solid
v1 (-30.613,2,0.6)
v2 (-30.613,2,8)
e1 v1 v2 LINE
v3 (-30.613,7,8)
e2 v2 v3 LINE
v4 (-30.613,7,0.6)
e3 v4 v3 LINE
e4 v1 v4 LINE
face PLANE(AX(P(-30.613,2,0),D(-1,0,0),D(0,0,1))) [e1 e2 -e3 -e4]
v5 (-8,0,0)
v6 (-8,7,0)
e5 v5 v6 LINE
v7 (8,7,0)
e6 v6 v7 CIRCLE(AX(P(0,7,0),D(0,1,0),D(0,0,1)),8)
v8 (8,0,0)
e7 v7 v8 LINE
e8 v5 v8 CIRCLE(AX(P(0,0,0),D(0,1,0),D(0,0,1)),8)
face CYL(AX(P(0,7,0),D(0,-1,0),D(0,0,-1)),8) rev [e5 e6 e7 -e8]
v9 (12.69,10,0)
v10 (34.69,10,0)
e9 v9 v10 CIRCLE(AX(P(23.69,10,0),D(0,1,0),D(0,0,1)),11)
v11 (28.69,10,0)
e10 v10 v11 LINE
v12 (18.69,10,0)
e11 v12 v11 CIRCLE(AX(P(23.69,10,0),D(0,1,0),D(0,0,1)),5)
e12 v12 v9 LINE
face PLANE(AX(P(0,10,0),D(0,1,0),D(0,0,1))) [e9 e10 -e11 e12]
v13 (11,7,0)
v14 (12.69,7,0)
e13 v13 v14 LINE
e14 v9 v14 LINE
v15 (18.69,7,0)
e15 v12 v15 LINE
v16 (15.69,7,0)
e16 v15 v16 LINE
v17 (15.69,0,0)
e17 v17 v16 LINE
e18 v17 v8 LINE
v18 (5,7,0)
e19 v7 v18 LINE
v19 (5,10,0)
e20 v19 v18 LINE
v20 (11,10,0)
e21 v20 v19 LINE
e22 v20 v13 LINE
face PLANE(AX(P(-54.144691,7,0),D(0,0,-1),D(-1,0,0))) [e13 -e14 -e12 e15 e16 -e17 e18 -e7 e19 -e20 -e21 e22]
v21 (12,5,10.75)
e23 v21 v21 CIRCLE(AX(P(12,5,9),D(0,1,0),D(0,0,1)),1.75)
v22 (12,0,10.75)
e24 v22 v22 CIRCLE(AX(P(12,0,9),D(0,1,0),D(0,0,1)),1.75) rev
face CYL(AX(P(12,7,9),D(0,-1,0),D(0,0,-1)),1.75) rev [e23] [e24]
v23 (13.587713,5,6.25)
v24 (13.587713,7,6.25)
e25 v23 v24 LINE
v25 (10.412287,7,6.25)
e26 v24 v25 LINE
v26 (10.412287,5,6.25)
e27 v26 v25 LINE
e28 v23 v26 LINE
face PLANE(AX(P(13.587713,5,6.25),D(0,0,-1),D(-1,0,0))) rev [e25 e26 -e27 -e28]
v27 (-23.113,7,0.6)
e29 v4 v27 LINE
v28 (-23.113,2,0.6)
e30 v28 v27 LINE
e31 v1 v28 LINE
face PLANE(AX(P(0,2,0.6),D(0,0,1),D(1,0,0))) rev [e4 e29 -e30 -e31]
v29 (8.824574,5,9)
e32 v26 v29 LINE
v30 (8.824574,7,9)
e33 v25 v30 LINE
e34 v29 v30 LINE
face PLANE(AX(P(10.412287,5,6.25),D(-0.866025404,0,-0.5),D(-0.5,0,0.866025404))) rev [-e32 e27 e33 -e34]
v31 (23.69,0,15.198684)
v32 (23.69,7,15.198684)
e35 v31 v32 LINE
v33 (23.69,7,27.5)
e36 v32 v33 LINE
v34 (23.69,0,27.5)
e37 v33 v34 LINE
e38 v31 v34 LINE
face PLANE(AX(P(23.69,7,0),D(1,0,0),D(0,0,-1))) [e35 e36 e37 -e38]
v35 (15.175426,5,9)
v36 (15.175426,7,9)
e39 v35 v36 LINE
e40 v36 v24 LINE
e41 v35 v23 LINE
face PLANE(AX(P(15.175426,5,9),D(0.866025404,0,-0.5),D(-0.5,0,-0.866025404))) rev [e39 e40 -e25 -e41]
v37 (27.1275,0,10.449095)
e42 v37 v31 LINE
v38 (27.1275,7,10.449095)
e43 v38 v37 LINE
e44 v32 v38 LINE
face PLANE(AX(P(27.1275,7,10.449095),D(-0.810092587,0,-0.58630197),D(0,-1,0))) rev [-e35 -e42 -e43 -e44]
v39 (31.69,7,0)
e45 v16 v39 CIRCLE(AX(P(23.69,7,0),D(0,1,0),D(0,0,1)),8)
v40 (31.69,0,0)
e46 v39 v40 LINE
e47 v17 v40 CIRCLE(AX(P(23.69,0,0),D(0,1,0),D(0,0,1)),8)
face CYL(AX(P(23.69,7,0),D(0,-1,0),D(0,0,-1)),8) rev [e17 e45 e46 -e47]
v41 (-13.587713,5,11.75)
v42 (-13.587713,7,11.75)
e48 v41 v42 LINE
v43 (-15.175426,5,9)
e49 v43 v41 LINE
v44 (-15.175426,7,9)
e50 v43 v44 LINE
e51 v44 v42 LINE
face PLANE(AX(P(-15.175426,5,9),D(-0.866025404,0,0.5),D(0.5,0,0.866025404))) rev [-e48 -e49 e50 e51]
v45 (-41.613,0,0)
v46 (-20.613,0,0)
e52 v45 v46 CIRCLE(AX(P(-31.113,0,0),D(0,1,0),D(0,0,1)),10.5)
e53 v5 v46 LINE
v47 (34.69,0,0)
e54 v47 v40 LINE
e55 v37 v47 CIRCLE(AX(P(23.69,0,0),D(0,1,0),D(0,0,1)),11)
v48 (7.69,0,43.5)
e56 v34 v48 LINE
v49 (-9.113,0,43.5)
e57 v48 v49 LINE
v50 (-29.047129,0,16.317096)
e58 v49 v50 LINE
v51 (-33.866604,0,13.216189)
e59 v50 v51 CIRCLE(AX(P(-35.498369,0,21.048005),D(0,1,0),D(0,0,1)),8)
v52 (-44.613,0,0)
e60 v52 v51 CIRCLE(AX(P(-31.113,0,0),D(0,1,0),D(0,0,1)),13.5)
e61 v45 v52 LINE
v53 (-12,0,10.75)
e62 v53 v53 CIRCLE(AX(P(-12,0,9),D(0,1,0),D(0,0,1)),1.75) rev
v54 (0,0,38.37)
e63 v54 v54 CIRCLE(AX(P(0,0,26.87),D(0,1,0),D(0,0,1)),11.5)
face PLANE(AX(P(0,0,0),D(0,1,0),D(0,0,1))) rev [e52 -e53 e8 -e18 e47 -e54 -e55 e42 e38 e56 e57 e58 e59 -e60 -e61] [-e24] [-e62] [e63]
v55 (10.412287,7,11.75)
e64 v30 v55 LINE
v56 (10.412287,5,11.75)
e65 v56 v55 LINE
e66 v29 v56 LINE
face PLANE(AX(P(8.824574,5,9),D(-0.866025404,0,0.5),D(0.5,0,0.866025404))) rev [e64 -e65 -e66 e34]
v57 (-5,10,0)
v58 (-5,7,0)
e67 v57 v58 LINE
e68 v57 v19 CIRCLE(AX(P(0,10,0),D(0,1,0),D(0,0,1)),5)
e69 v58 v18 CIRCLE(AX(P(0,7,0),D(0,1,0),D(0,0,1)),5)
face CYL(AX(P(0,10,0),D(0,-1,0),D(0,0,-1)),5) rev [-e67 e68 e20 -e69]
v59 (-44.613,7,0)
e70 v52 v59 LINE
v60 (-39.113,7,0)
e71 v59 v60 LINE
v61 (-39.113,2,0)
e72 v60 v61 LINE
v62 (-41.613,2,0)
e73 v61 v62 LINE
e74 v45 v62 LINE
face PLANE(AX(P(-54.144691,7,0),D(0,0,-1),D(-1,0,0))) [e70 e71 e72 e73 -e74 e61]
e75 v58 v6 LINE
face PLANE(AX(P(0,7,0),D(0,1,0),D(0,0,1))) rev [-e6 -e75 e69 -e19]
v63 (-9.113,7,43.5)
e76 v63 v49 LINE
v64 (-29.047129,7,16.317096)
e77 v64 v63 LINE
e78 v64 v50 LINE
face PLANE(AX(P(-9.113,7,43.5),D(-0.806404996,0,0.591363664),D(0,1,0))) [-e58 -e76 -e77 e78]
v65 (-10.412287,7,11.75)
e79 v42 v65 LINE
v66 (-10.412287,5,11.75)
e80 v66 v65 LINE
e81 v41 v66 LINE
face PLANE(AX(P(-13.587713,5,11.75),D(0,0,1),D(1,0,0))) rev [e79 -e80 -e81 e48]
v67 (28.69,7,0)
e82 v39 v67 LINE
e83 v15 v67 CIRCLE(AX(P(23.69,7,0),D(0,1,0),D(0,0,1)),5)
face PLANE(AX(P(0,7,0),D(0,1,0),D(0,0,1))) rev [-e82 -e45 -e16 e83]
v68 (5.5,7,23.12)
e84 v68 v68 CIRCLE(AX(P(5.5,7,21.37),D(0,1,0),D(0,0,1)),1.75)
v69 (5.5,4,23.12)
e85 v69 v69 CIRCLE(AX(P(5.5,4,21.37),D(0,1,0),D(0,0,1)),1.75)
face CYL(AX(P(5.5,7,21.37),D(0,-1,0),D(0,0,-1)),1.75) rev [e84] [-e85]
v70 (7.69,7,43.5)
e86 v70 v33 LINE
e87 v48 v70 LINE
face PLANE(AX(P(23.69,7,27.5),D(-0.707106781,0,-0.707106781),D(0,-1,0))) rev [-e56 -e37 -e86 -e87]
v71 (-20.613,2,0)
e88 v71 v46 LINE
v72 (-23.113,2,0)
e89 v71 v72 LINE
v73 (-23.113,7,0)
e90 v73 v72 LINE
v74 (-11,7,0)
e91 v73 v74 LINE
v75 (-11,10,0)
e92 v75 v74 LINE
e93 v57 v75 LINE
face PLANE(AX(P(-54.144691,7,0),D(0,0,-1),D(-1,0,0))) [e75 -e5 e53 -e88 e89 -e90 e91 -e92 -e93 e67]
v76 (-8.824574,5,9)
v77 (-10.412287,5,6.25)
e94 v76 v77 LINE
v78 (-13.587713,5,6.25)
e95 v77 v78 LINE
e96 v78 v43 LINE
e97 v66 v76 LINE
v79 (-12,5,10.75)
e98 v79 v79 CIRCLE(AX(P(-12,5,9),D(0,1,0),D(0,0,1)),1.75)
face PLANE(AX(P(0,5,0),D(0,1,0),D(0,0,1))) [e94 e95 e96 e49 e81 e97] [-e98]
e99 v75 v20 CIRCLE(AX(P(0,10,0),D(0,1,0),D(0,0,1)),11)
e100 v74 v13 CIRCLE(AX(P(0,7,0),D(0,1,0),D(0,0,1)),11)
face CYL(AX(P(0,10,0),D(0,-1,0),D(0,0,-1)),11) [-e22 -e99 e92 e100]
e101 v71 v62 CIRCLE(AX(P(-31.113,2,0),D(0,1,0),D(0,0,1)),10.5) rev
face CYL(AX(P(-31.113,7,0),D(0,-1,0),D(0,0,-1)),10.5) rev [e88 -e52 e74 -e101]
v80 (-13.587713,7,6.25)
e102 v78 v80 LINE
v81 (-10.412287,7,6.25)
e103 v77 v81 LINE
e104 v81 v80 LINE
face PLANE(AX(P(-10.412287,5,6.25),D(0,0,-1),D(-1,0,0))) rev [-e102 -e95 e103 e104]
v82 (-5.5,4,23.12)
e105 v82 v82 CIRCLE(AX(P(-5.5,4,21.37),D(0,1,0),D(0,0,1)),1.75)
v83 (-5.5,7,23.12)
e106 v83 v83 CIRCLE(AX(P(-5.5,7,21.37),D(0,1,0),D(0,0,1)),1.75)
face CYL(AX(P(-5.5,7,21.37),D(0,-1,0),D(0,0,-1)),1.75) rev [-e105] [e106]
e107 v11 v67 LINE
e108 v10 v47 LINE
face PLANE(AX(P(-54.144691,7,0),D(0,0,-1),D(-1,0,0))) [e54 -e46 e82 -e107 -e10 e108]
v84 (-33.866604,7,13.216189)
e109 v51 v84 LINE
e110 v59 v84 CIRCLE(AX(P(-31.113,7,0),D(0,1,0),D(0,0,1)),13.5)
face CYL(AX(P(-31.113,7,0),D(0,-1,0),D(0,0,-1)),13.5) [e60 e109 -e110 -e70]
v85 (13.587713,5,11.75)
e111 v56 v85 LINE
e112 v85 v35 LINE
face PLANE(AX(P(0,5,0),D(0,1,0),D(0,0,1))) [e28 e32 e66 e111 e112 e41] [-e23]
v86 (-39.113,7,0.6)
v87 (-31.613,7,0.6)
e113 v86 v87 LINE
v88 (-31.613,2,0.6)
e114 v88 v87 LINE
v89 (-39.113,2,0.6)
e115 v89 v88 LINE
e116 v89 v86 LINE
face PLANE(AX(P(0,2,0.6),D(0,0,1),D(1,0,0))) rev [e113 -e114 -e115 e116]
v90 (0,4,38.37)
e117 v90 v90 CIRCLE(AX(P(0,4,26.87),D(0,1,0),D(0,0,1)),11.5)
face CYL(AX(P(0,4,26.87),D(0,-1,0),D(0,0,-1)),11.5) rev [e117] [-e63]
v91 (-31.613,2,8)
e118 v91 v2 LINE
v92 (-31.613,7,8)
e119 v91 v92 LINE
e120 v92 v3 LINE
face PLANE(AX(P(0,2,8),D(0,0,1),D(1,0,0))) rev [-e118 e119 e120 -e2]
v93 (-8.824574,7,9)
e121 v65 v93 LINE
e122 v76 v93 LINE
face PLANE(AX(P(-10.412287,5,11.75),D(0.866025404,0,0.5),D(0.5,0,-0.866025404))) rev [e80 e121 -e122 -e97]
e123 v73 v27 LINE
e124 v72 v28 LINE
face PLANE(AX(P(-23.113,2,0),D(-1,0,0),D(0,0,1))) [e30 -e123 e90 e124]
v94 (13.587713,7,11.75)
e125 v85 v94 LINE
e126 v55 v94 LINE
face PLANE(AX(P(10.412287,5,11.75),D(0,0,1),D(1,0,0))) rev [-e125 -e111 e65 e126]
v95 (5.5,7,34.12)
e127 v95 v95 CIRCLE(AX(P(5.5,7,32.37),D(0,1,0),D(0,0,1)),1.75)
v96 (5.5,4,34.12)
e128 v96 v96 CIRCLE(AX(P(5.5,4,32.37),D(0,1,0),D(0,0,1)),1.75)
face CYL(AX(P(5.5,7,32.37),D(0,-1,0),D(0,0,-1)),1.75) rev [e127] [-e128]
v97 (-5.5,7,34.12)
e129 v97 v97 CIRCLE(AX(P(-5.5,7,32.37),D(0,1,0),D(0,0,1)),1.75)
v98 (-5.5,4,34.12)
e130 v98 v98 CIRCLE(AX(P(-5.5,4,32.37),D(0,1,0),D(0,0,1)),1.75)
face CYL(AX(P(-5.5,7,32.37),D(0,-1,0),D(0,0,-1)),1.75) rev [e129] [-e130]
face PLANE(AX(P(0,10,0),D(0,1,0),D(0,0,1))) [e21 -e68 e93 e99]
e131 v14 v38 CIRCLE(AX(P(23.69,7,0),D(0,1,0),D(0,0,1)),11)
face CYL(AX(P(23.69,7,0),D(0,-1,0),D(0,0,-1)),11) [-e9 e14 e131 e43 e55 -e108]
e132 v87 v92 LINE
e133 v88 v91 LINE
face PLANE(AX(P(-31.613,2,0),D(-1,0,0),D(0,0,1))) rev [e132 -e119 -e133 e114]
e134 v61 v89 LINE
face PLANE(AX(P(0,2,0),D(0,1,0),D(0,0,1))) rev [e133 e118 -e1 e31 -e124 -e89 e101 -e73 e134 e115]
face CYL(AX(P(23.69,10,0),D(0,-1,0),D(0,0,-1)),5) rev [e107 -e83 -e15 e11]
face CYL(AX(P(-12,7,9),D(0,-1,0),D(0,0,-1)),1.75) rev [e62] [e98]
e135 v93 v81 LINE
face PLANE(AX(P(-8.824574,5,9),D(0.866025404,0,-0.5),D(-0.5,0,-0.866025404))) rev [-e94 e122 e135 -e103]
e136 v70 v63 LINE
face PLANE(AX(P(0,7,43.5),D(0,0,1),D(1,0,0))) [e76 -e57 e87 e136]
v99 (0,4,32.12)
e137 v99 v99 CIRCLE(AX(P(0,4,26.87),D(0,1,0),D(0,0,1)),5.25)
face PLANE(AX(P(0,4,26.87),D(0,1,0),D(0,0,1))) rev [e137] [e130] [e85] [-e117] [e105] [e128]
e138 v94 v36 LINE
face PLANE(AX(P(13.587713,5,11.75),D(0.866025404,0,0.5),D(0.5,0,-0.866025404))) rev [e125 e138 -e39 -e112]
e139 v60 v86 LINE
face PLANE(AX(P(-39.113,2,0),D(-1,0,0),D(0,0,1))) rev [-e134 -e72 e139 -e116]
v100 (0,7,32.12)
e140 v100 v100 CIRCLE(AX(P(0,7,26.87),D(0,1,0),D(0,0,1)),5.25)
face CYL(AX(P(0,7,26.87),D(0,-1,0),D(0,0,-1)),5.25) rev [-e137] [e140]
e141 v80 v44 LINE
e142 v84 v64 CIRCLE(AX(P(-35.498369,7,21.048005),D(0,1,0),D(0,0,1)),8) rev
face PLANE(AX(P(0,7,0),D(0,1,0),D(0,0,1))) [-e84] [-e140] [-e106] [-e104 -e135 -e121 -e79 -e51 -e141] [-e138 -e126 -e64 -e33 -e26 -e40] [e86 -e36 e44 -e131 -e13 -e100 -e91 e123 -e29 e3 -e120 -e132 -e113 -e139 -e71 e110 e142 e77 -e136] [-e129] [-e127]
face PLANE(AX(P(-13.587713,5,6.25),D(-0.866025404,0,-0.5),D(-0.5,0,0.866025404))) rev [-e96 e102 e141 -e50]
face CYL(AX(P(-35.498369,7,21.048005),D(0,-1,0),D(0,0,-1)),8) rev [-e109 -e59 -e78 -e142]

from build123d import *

# Parameters (mm, degrees)
SKETCH3_R               = 8
SKETCH3_W               = 54.803
SKETCH3_H               = 30
SKETCH3_R_2             = 5.25
BOSS_EXTRUDE1_DEPTH     = 7
CUT_EXTRUDE3_DEPTH      = 63.702230973
CUT_EXTRUDE3_DEPTH_BACK = 63.702230973
SKETCH4_R               = 1.75
CHAMFER1_SIZE           = 2.5
CUT_EXTRUDE5_DEPTH      = 63.702230973
CUT_EXTRUDE5_DEPTH_BACK = 63.702230973
SKETCH9_R               = 1.75
CUT_EXTRUDE6_START      = -2
SKETCH10_R              = 1.75
CUT_EXTRUDE6_DEPTH      = 2
CHAMFER3_SIZE2          = 22
CHAMFER3_SIZE           = 30
CHAMFER4_SIZE           = 16
FILLET1_DEPTH           = 7
BOSS_EXTRUDE6_START     = -5
SKETCH15_R              = 10.5
BOSS_EXTRUDE6_DEPTH     = 5
CUT_EXTRUDE7_DEPTH      = 63.702230973
CUT_EXTRUDE7_DEPTH_BACK = 63.702230973
SKETCH16_W              = 93.911326915
SKETCH16_H              = 20.32689663
SKETCH17_R              = 11.5
SKETCH17_R_2            = 5.25
CUT_EXTRUDE8_DEPTH      = 4
BOSS_EXTRUDE7_DEPTH     = 3


with BuildPart() as part:
    # Sketch3 → Boss-Extrude1 (new body)
    # profile 1 of 10: a face of its own
    with BuildSketch(Plane(origin=(0, 0, 0), x_dir=(1, 0, 0), z_dir=(0, 1, 0))):
        with BuildLine():
            ThreePointArc((-17.613, 0), (-21.567058454, 9.545941546), (-31.113, 13.5))
            Line((-31.113, 13.5), (-31.113, 10.5))
            ThreePointArc((-31.113, 10.5), (-23.688378798, 7.424621202), (-20.613, 0))
            ThreePointArc((-20.613, 0), (-23.688378798, -7.424621202), (-31.113, -10.5))
            Line((-31.113, -10.5), (-31.113, -13.5))
            ThreePointArc((-31.113, -13.5), (-21.567058454, -9.545941546), (-17.613, 0))
        make_face()
    # profile 2 of 10: a face of its own
    with BuildSketch(Plane(origin=(0, 0, 0), x_dir=(1, 0, 0), z_dir=(0, 1, 0))):
        with BuildLine():
            Line((-31.113, 10.5), (-31.113, 13.5))
            ThreePointArc((-31.113, 13.5), (-44.613, 0), (-31.113, -13.5))
            Line((-31.113, -13.5), (-31.113, -10.5))
            ThreePointArc((-31.113, -10.5), (-41.613, 0), (-31.113, 10.5))
        make_face()
    # profile 3 of 10: a face of its own
    with BuildSketch(Plane(origin=(0, 0, 0), x_dir=(1, 0, 0), z_dir=(0, 1, 0))):
        with BuildLine():
            Line((23.69, 13.5), (-31.113, 13.5))
            ThreePointArc((-31.113, 13.5), (-21.567058454, 9.545941546), (-17.613, 0))
            ThreePointArc((-17.613, 0), (-21.567058454, -9.545941546), (-31.113, -13.5))
            Line((-31.113, -13.5), (23.69, -13.5))
            Line((23.69, -13.5), (23.69, -11))
            ThreePointArc((23.69, -11), (12.69, 0), (23.69, 11))
            Line((23.69, 11), (23.69, 13.5))
        make_face()
        with Locations(Location((0, 0, 0), (0, 0, 270))):
            Circle(SKETCH3_R, mode=Mode.SUBTRACT)
    # profile 4 of 10: a face of its own
    with BuildSketch(Plane(origin=(0, 0, 0), x_dir=(1, 0, 0), z_dir=(0, 1, 0))):
        with BuildLine():
            ThreePointArc((-17.613, 0), (-21.567058454, 9.545941546), (-31.113, 13.5))
            Line((-31.113, 13.5), (-31.113, 10.5))
            ThreePointArc((-31.113, 10.5), (-23.688378798, 7.424621202), (-20.613, 0))
            ThreePointArc((-20.613, 0), (-23.688378798, -7.424621202), (-31.113, -10.5))
            Line((-31.113, -10.5), (-31.113, -13.5))
            ThreePointArc((-31.113, -13.5), (-21.567058454, -9.545941546), (-17.613, 0))
        make_face()
    # profile 5 of 10: a face of its own
    with BuildSketch(Plane(origin=(0, 0, 0), x_dir=(1, 0, 0), z_dir=(0, 1, 0))):
        with BuildLine():
            Line((-31.113, 10.5), (-31.113, 13.5))
            ThreePointArc((-31.113, 13.5), (-44.613, 0), (-31.113, -13.5))
            Line((-31.113, -13.5), (-31.113, -10.5))
            ThreePointArc((-31.113, -10.5), (-41.613, 0), (-31.113, 10.5))
        make_face()
    # profile 6 of 10: a face of its own
    with BuildSketch(Plane(origin=(0, 0, 0), x_dir=(1, 0, 0), z_dir=(0, 1, 0))):
        with BuildLine():
            ThreePointArc((34.69, 0), (31.468174593, 7.778174593), (23.69, 11))
            Line((23.69, 11), (23.69, 8))
            ThreePointArc((23.69, 8), (29.346854249, 5.656854249), (31.69, 0))
            ThreePointArc((31.69, 0), (29.346854249, -5.656854249), (23.69, -8))
            Line((23.69, -8), (23.69, -11))
            ThreePointArc((23.69, -11), (31.468174593, -7.778174593), (34.69, 0))
        make_face()
    # profile 7 of 10: a face of its own
    with BuildSketch(Plane(origin=(0, 0, 0), x_dir=(1, 0, 0), z_dir=(0, 1, 0))):
        with BuildLine():
            Line((23.69, 8), (23.69, 11))
            ThreePointArc((23.69, 11), (12.69, 0), (23.69, -11))
            Line((23.69, -11), (23.69, -8))
            ThreePointArc((23.69, -8), (15.69, 0), (23.69, 8))
        make_face()
    # profile 8 of 10: a face of its own
    with BuildSketch(Plane(origin=(0, 0, 0), x_dir=(1, 0, 0), z_dir=(0, 1, 0))):
        with Locations((-3.7115, -28.5)):
            Rectangle(SKETCH3_W, SKETCH3_H)
        with Locations(Location((0, -26.87, 0), (0, 0, 270))):
            Circle(SKETCH3_R_2, mode=Mode.SUBTRACT)
    # profile 9 of 10: a face of its own
    with BuildSketch(Plane(origin=(0, 0, 0), x_dir=(1, 0, 0), z_dir=(0, 1, 0))):
        with BuildLine():
            ThreePointArc((34.69, 0), (31.468174593, 7.778174593), (23.69, 11))
            Line((23.69, 11), (23.69, 8))
            ThreePointArc((23.69, 8), (29.346854249, 5.656854249), (31.69, 0))
            ThreePointArc((31.69, 0), (29.346854249, -5.656854249), (23.69, -8))
            Line((23.69, -8), (23.69, -11))
            ThreePointArc((23.69, -11), (31.468174593, -7.778174593), (34.69, 0))
        make_face()
    # profile 10 of 10: a face of its own
    with BuildSketch(Plane(origin=(0, 0, 0), x_dir=(1, 0, 0), z_dir=(0, 1, 0))):
        with BuildLine():
            Line((23.69, 8), (23.69, 11))
            ThreePointArc((23.69, 11), (12.69, 0), (23.69, -11))
            Line((23.69, -11), (23.69, -8))
            ThreePointArc((23.69, -8), (15.69, 0), (23.69, 8))
        make_face()
    extrude(amount=BOSS_EXTRUDE1_DEPTH)

    # Sketch4 → Cut-Extrude3 (cut, two sides: drawn at the far end of the back side and taken through both)
    with BuildSketch(Plane(origin=(0, 0, 0), x_dir=(1, 0, 0), z_dir=(0, 1, 0)).offset(-CUT_EXTRUDE3_DEPTH_BACK)):
        with Locations(Location((5.5, -21.37, 0), (0, 0, 270))):
            Circle(SKETCH4_R)
        with Locations(Location((5.5, -32.37, 0), (0, 0, 270))):
            Circle(SKETCH4_R)
        with Locations(Location((-5.5, -32.37, 0), (0, 0, 270))):
            Circle(SKETCH4_R)
        with Locations(Location((-5.5, -21.37, 0), (0, 0, 270))):
            Circle(SKETCH4_R)
    extrude(amount=CUT_EXTRUDE3_DEPTH + CUT_EXTRUDE3_DEPTH_BACK, mode=Mode.SUBTRACT)

    # Chamfer1
    # the kernel refuses this chamfer: 2.5 mm, written as the material it adds along each edge
    with BuildSketch(Plane(origin=(23.69, 0, -11), x_dir=(0, 0, -1), z_dir=(0, 1, 0))) as chamfer1_piece_1_section:
        with BuildLine():
            Line((CHAMFER1_SIZE, 0), (-0.385093792, -2.885093792))
            ThreePointArc((-0.385093792, -2.885093792), (-0.102088007, -1.495163601), (0, 0))
            Line((0, 0), (CHAMFER1_SIZE, 0))
        make_face()
    chamfer1_piece_1 = extrude(amount=7, mode=Mode.PRIVATE)
    chamfer1_piece_1 = split(chamfer1_piece_1, bisect_by=Plane(origin=(23.69, 0, -13.5), z_dir=(0, 0, 1)), keep=Keep.TOP, mode=Mode.PRIVATE)
    add(chamfer1_piece_1)

    # Sketch9 → Cut-Extrude5 (cut, two sides: drawn at the far end of the back side and taken through both)
    with BuildSketch(Plane(origin=(0, 0, 0), x_dir=(1, 0, 0), z_dir=(0, 1, 0)).offset(-CUT_EXTRUDE5_DEPTH_BACK)):
        with Locations(Location((12, 9, 0), (0, 0, 270))):
            Circle(SKETCH9_R)
        with Locations(Location((12, -9, 0), (0, 0, 270))):
            Circle(SKETCH9_R)
        with Locations(Location((-12, -9, 0), (0, 0, 270))):
            Circle(SKETCH9_R)
        with Locations(Location((-12, 9, 0), (0, 0, 270))):
            Circle(SKETCH9_R)
    extrude(amount=CUT_EXTRUDE5_DEPTH + CUT_EXTRUDE5_DEPTH_BACK, mode=Mode.SUBTRACT)

    # Sketch10 → Cut-Extrude6 (cut)
    # profile 1 of 4: a face of its own
    with BuildSketch(Plane(origin=(0, 7, 0), x_dir=(1, 0, 0), z_dir=(0, 1, 0)).offset(CUT_EXTRUDE6_START)):
        Polygon((-15.175426481, -9), (-13.58771324, -11.75), (-10.41228676, -11.75), (-8.824573519, -9), (-10.41228676, -6.25), (-13.58771324, -6.25), align=None)
        with Locations(Location((-12, -9, 0), (0, 0, 270))):
            Circle(SKETCH10_R, mode=Mode.SUBTRACT)
    # profile 2 of 4: a face of its own
    with BuildSketch(Plane(origin=(0, 7, 0), x_dir=(1, 0, 0), z_dir=(0, 1, 0)).offset(CUT_EXTRUDE6_START)):
        Polygon((-15.175426481, 9), (-13.58771324, 6.25), (-10.41228676, 6.25), (-8.824573519, 9), (-10.41228676, 11.75), (-13.58771324, 11.75), align=None)
        with Locations(Location((-12, 9, 0), (0, 0, 270))):
            Circle(SKETCH10_R, mode=Mode.SUBTRACT)
    # profile 3 of 4: a face of its own
    with BuildSketch(Plane(origin=(0, 7, 0), x_dir=(1, 0, 0), z_dir=(0, 1, 0)).offset(CUT_EXTRUDE6_START)):
        Polygon((15.175426481, 9), (13.58771324, 11.75), (10.41228676, 11.75), (8.824573519, 9), (10.41228676, 6.25), (13.58771324, 6.25), align=None)
        with Locations(Location((12, 9, 0), (0, 0, 270))):
            Circle(SKETCH10_R, mode=Mode.SUBTRACT)
    # profile 4 of 4: a face of its own
    with BuildSketch(Plane(origin=(0, 7, 0), x_dir=(1, 0, 0), z_dir=(0, 1, 0)).offset(CUT_EXTRUDE6_START)):
        Polygon((15.175426481, -9), (13.58771324, -6.25), (10.41228676, -6.25), (8.824573519, -9), (10.41228676, -11.75), (13.58771324, -11.75), align=None)
        with Locations(Location((12, -9, 0), (0, 0, 270))):
            Circle(SKETCH10_R, mode=Mode.SUBTRACT)
    extrude(amount=CUT_EXTRUDE6_DEPTH, mode=Mode.SUBTRACT)

    # Chamfer2
    # the kernel refuses this chamfer: 5 mm, written as the material it adds along each edge
    with BuildSketch(Plane(origin=(23.69, 0, 11), x_dir=(0.9874000606639179, 0, -0.15824386307497393), z_dir=(0, 1, 0))) as chamfer2_piece_1:
        with BuildLine():
            Line((3.622786344, 0.141421356), (-0.805837357, -4.287202344))
            Line((-0.805837357, -4.287202344), (-0.904577363, -4.271377958))
            ThreePointArc((-0.904577363, -4.271377958), (-0.443767224, -2.137054655), (-0.098740006, 0.015824386))
            Line((-0.098740006, 0.015824386), (0.015824386, 0.098740006))
            ThreePointArc((0.015824386, 0.098740006), (1.81210794, -0.038365312), (3.606961958, 0.240161362))
            Line((3.606961958, 0.240161362), (3.622786344, 0.141421356))
        make_face()
    extrude(amount=7)

    # Chamfer3
    chamfer3_edges = [part.edges().sort_by_distance(p)[0] for p in [
        (-31.113, 3.5, 43.5),
    ]]
    chamfer3_side = [part.faces().sort_by_distance(p)[0] for p in [
        (-31.113, 3.5, 43.06),
    ]]
    chamfer(chamfer3_edges, length=CHAMFER3_SIZE - 0.0001, length2=CHAMFER3_SIZE2 - 0.0001, reference=chamfer3_side[0])  # a hair under: the kernel refuses the full size

    # Chamfer4
    chamfer4_edges = [part.edges().sort_by_distance(p)[0] for p in [
        (23.69, 3.5, 43.5),
    ]]
    chamfer(chamfer4_edges, length=CHAMFER4_SIZE)

    # Fillet1: read off the stored shape, not the designer's step
    # Fillet1 outline → Fillet1 (add)
    with BuildSketch(Plane(origin=(0, 0, 0), x_dir=(1, 0, 0), z_dir=(0, 1, 0))):
        with BuildLine():
            ThreePointArc((-31.113, -13.5), (-32.497095712, -13.428859932), (-33.866604066, -13.21618949))
            ThreePointArc((-33.866604066, -13.21618949), (-31.169668779, -14.320275511), (-29.047129471, -16.317096176))
            Line((-29.047129471, -16.317096176), (-31.113, -13.5))
        make_face()
    extrude(amount=FILLET1_DEPTH)

    # Sketch15 → Boss-Extrude6 (add)
    with BuildSketch(Plane(origin=(0, 7, 0), x_dir=(1, 0, 0), z_dir=(0, 1, 0)).offset(BOSS_EXTRUDE6_START)):
        with Locations(Location((-31.113, 0, 0), (0, 0, 270))):
            Circle(SKETCH15_R)
        Polygon((-31.613, 0.6), (-31.613, 8), (-30.613, 8), (-30.613, 0.6), (-23.113, 0.6), (-23.113, -0.6), (-30.613, -0.6), (-30.613, -8), (-31.613, -8), (-31.613, -0.6), (-39.113, -0.6), (-39.113, 0.6), align=None, mode=Mode.SUBTRACT)
    extrude(amount=BOSS_EXTRUDE6_DEPTH)

    # Sketch16 → Cut-Extrude7 (cut, two sides: drawn at the far end of the back side and taken through both)
    with BuildSketch(Plane(origin=(0, 0, 0), x_dir=(1, 0, 0), z_dir=(0, 1, 0)).offset(-CUT_EXTRUDE7_DEPTH_BACK)):
        with Locations((-7.189027051, 10.163448315)):
            Rectangle(SKETCH16_W, SKETCH16_H)
    extrude(amount=CUT_EXTRUDE7_DEPTH + CUT_EXTRUDE7_DEPTH_BACK, mode=Mode.SUBTRACT)

    # Sketch17 → Cut-Extrude8 (cut)
    with BuildSketch(Plane(origin=(0, 0, 0), x_dir=(1, 0, 0), z_dir=(0, 1, 0))):
        with Locations(Location((0, -26.87, 0), (0, 0, 270))):
            Circle(SKETCH17_R)
        with Locations(Location((0, -26.87, 0), (0, 0, 270))):
            Circle(SKETCH17_R_2, mode=Mode.SUBTRACT)
    extrude(amount=CUT_EXTRUDE8_DEPTH, mode=Mode.SUBTRACT)

    # Sketch18 → Boss-Extrude7 (add)
    with BuildSketch(Plane(origin=(0, 7, 0), x_dir=(1, 0, 0), z_dir=(0, 1, 0))):
        with BuildLine():
            ThreePointArc((-8, 0), (0, -8), (8, 0))
            Line((8, 0), (5, 0))
            ThreePointArc((5, 0), (0, -5), (-5, 0))
            Line((-5, 0), (-8, 0))
        make_face()
        with BuildLine():
            ThreePointArc((-11, 0), (0, -11), (11, 0))
            Line((11, 0), (8, 0))
            ThreePointArc((8, 0), (0, -8), (-8, 0))
            Line((-8, 0), (-11, 0))
        make_face()
        with BuildLine():
            ThreePointArc((27.1275, -10.449095356), (32.60101846, -6.44932167), (34.69, 0))
            Line((34.69, 0), (31.69, 0))
            ThreePointArc((31.69, 0), (23.69, -8), (15.69, 0))
            Line((15.69, 0), (12.69, 0))
            ThreePointArc((12.69, 0), (17.24067833, -8.91101846), (27.1275, -10.449095356))
        make_face()
        with BuildLine():
            ThreePointArc((15.69, 0), (23.69, -8), (31.69, 0))
            Line((31.69, 0), (28.69, 0))
            ThreePointArc((28.69, 0), (23.69, -5), (18.69, 0))
            Line((18.69, 0), (15.69, 0))
        make_face()
    extrude(amount=BOSS_EXTRUDE7_DEPTH)


solid = part.part
